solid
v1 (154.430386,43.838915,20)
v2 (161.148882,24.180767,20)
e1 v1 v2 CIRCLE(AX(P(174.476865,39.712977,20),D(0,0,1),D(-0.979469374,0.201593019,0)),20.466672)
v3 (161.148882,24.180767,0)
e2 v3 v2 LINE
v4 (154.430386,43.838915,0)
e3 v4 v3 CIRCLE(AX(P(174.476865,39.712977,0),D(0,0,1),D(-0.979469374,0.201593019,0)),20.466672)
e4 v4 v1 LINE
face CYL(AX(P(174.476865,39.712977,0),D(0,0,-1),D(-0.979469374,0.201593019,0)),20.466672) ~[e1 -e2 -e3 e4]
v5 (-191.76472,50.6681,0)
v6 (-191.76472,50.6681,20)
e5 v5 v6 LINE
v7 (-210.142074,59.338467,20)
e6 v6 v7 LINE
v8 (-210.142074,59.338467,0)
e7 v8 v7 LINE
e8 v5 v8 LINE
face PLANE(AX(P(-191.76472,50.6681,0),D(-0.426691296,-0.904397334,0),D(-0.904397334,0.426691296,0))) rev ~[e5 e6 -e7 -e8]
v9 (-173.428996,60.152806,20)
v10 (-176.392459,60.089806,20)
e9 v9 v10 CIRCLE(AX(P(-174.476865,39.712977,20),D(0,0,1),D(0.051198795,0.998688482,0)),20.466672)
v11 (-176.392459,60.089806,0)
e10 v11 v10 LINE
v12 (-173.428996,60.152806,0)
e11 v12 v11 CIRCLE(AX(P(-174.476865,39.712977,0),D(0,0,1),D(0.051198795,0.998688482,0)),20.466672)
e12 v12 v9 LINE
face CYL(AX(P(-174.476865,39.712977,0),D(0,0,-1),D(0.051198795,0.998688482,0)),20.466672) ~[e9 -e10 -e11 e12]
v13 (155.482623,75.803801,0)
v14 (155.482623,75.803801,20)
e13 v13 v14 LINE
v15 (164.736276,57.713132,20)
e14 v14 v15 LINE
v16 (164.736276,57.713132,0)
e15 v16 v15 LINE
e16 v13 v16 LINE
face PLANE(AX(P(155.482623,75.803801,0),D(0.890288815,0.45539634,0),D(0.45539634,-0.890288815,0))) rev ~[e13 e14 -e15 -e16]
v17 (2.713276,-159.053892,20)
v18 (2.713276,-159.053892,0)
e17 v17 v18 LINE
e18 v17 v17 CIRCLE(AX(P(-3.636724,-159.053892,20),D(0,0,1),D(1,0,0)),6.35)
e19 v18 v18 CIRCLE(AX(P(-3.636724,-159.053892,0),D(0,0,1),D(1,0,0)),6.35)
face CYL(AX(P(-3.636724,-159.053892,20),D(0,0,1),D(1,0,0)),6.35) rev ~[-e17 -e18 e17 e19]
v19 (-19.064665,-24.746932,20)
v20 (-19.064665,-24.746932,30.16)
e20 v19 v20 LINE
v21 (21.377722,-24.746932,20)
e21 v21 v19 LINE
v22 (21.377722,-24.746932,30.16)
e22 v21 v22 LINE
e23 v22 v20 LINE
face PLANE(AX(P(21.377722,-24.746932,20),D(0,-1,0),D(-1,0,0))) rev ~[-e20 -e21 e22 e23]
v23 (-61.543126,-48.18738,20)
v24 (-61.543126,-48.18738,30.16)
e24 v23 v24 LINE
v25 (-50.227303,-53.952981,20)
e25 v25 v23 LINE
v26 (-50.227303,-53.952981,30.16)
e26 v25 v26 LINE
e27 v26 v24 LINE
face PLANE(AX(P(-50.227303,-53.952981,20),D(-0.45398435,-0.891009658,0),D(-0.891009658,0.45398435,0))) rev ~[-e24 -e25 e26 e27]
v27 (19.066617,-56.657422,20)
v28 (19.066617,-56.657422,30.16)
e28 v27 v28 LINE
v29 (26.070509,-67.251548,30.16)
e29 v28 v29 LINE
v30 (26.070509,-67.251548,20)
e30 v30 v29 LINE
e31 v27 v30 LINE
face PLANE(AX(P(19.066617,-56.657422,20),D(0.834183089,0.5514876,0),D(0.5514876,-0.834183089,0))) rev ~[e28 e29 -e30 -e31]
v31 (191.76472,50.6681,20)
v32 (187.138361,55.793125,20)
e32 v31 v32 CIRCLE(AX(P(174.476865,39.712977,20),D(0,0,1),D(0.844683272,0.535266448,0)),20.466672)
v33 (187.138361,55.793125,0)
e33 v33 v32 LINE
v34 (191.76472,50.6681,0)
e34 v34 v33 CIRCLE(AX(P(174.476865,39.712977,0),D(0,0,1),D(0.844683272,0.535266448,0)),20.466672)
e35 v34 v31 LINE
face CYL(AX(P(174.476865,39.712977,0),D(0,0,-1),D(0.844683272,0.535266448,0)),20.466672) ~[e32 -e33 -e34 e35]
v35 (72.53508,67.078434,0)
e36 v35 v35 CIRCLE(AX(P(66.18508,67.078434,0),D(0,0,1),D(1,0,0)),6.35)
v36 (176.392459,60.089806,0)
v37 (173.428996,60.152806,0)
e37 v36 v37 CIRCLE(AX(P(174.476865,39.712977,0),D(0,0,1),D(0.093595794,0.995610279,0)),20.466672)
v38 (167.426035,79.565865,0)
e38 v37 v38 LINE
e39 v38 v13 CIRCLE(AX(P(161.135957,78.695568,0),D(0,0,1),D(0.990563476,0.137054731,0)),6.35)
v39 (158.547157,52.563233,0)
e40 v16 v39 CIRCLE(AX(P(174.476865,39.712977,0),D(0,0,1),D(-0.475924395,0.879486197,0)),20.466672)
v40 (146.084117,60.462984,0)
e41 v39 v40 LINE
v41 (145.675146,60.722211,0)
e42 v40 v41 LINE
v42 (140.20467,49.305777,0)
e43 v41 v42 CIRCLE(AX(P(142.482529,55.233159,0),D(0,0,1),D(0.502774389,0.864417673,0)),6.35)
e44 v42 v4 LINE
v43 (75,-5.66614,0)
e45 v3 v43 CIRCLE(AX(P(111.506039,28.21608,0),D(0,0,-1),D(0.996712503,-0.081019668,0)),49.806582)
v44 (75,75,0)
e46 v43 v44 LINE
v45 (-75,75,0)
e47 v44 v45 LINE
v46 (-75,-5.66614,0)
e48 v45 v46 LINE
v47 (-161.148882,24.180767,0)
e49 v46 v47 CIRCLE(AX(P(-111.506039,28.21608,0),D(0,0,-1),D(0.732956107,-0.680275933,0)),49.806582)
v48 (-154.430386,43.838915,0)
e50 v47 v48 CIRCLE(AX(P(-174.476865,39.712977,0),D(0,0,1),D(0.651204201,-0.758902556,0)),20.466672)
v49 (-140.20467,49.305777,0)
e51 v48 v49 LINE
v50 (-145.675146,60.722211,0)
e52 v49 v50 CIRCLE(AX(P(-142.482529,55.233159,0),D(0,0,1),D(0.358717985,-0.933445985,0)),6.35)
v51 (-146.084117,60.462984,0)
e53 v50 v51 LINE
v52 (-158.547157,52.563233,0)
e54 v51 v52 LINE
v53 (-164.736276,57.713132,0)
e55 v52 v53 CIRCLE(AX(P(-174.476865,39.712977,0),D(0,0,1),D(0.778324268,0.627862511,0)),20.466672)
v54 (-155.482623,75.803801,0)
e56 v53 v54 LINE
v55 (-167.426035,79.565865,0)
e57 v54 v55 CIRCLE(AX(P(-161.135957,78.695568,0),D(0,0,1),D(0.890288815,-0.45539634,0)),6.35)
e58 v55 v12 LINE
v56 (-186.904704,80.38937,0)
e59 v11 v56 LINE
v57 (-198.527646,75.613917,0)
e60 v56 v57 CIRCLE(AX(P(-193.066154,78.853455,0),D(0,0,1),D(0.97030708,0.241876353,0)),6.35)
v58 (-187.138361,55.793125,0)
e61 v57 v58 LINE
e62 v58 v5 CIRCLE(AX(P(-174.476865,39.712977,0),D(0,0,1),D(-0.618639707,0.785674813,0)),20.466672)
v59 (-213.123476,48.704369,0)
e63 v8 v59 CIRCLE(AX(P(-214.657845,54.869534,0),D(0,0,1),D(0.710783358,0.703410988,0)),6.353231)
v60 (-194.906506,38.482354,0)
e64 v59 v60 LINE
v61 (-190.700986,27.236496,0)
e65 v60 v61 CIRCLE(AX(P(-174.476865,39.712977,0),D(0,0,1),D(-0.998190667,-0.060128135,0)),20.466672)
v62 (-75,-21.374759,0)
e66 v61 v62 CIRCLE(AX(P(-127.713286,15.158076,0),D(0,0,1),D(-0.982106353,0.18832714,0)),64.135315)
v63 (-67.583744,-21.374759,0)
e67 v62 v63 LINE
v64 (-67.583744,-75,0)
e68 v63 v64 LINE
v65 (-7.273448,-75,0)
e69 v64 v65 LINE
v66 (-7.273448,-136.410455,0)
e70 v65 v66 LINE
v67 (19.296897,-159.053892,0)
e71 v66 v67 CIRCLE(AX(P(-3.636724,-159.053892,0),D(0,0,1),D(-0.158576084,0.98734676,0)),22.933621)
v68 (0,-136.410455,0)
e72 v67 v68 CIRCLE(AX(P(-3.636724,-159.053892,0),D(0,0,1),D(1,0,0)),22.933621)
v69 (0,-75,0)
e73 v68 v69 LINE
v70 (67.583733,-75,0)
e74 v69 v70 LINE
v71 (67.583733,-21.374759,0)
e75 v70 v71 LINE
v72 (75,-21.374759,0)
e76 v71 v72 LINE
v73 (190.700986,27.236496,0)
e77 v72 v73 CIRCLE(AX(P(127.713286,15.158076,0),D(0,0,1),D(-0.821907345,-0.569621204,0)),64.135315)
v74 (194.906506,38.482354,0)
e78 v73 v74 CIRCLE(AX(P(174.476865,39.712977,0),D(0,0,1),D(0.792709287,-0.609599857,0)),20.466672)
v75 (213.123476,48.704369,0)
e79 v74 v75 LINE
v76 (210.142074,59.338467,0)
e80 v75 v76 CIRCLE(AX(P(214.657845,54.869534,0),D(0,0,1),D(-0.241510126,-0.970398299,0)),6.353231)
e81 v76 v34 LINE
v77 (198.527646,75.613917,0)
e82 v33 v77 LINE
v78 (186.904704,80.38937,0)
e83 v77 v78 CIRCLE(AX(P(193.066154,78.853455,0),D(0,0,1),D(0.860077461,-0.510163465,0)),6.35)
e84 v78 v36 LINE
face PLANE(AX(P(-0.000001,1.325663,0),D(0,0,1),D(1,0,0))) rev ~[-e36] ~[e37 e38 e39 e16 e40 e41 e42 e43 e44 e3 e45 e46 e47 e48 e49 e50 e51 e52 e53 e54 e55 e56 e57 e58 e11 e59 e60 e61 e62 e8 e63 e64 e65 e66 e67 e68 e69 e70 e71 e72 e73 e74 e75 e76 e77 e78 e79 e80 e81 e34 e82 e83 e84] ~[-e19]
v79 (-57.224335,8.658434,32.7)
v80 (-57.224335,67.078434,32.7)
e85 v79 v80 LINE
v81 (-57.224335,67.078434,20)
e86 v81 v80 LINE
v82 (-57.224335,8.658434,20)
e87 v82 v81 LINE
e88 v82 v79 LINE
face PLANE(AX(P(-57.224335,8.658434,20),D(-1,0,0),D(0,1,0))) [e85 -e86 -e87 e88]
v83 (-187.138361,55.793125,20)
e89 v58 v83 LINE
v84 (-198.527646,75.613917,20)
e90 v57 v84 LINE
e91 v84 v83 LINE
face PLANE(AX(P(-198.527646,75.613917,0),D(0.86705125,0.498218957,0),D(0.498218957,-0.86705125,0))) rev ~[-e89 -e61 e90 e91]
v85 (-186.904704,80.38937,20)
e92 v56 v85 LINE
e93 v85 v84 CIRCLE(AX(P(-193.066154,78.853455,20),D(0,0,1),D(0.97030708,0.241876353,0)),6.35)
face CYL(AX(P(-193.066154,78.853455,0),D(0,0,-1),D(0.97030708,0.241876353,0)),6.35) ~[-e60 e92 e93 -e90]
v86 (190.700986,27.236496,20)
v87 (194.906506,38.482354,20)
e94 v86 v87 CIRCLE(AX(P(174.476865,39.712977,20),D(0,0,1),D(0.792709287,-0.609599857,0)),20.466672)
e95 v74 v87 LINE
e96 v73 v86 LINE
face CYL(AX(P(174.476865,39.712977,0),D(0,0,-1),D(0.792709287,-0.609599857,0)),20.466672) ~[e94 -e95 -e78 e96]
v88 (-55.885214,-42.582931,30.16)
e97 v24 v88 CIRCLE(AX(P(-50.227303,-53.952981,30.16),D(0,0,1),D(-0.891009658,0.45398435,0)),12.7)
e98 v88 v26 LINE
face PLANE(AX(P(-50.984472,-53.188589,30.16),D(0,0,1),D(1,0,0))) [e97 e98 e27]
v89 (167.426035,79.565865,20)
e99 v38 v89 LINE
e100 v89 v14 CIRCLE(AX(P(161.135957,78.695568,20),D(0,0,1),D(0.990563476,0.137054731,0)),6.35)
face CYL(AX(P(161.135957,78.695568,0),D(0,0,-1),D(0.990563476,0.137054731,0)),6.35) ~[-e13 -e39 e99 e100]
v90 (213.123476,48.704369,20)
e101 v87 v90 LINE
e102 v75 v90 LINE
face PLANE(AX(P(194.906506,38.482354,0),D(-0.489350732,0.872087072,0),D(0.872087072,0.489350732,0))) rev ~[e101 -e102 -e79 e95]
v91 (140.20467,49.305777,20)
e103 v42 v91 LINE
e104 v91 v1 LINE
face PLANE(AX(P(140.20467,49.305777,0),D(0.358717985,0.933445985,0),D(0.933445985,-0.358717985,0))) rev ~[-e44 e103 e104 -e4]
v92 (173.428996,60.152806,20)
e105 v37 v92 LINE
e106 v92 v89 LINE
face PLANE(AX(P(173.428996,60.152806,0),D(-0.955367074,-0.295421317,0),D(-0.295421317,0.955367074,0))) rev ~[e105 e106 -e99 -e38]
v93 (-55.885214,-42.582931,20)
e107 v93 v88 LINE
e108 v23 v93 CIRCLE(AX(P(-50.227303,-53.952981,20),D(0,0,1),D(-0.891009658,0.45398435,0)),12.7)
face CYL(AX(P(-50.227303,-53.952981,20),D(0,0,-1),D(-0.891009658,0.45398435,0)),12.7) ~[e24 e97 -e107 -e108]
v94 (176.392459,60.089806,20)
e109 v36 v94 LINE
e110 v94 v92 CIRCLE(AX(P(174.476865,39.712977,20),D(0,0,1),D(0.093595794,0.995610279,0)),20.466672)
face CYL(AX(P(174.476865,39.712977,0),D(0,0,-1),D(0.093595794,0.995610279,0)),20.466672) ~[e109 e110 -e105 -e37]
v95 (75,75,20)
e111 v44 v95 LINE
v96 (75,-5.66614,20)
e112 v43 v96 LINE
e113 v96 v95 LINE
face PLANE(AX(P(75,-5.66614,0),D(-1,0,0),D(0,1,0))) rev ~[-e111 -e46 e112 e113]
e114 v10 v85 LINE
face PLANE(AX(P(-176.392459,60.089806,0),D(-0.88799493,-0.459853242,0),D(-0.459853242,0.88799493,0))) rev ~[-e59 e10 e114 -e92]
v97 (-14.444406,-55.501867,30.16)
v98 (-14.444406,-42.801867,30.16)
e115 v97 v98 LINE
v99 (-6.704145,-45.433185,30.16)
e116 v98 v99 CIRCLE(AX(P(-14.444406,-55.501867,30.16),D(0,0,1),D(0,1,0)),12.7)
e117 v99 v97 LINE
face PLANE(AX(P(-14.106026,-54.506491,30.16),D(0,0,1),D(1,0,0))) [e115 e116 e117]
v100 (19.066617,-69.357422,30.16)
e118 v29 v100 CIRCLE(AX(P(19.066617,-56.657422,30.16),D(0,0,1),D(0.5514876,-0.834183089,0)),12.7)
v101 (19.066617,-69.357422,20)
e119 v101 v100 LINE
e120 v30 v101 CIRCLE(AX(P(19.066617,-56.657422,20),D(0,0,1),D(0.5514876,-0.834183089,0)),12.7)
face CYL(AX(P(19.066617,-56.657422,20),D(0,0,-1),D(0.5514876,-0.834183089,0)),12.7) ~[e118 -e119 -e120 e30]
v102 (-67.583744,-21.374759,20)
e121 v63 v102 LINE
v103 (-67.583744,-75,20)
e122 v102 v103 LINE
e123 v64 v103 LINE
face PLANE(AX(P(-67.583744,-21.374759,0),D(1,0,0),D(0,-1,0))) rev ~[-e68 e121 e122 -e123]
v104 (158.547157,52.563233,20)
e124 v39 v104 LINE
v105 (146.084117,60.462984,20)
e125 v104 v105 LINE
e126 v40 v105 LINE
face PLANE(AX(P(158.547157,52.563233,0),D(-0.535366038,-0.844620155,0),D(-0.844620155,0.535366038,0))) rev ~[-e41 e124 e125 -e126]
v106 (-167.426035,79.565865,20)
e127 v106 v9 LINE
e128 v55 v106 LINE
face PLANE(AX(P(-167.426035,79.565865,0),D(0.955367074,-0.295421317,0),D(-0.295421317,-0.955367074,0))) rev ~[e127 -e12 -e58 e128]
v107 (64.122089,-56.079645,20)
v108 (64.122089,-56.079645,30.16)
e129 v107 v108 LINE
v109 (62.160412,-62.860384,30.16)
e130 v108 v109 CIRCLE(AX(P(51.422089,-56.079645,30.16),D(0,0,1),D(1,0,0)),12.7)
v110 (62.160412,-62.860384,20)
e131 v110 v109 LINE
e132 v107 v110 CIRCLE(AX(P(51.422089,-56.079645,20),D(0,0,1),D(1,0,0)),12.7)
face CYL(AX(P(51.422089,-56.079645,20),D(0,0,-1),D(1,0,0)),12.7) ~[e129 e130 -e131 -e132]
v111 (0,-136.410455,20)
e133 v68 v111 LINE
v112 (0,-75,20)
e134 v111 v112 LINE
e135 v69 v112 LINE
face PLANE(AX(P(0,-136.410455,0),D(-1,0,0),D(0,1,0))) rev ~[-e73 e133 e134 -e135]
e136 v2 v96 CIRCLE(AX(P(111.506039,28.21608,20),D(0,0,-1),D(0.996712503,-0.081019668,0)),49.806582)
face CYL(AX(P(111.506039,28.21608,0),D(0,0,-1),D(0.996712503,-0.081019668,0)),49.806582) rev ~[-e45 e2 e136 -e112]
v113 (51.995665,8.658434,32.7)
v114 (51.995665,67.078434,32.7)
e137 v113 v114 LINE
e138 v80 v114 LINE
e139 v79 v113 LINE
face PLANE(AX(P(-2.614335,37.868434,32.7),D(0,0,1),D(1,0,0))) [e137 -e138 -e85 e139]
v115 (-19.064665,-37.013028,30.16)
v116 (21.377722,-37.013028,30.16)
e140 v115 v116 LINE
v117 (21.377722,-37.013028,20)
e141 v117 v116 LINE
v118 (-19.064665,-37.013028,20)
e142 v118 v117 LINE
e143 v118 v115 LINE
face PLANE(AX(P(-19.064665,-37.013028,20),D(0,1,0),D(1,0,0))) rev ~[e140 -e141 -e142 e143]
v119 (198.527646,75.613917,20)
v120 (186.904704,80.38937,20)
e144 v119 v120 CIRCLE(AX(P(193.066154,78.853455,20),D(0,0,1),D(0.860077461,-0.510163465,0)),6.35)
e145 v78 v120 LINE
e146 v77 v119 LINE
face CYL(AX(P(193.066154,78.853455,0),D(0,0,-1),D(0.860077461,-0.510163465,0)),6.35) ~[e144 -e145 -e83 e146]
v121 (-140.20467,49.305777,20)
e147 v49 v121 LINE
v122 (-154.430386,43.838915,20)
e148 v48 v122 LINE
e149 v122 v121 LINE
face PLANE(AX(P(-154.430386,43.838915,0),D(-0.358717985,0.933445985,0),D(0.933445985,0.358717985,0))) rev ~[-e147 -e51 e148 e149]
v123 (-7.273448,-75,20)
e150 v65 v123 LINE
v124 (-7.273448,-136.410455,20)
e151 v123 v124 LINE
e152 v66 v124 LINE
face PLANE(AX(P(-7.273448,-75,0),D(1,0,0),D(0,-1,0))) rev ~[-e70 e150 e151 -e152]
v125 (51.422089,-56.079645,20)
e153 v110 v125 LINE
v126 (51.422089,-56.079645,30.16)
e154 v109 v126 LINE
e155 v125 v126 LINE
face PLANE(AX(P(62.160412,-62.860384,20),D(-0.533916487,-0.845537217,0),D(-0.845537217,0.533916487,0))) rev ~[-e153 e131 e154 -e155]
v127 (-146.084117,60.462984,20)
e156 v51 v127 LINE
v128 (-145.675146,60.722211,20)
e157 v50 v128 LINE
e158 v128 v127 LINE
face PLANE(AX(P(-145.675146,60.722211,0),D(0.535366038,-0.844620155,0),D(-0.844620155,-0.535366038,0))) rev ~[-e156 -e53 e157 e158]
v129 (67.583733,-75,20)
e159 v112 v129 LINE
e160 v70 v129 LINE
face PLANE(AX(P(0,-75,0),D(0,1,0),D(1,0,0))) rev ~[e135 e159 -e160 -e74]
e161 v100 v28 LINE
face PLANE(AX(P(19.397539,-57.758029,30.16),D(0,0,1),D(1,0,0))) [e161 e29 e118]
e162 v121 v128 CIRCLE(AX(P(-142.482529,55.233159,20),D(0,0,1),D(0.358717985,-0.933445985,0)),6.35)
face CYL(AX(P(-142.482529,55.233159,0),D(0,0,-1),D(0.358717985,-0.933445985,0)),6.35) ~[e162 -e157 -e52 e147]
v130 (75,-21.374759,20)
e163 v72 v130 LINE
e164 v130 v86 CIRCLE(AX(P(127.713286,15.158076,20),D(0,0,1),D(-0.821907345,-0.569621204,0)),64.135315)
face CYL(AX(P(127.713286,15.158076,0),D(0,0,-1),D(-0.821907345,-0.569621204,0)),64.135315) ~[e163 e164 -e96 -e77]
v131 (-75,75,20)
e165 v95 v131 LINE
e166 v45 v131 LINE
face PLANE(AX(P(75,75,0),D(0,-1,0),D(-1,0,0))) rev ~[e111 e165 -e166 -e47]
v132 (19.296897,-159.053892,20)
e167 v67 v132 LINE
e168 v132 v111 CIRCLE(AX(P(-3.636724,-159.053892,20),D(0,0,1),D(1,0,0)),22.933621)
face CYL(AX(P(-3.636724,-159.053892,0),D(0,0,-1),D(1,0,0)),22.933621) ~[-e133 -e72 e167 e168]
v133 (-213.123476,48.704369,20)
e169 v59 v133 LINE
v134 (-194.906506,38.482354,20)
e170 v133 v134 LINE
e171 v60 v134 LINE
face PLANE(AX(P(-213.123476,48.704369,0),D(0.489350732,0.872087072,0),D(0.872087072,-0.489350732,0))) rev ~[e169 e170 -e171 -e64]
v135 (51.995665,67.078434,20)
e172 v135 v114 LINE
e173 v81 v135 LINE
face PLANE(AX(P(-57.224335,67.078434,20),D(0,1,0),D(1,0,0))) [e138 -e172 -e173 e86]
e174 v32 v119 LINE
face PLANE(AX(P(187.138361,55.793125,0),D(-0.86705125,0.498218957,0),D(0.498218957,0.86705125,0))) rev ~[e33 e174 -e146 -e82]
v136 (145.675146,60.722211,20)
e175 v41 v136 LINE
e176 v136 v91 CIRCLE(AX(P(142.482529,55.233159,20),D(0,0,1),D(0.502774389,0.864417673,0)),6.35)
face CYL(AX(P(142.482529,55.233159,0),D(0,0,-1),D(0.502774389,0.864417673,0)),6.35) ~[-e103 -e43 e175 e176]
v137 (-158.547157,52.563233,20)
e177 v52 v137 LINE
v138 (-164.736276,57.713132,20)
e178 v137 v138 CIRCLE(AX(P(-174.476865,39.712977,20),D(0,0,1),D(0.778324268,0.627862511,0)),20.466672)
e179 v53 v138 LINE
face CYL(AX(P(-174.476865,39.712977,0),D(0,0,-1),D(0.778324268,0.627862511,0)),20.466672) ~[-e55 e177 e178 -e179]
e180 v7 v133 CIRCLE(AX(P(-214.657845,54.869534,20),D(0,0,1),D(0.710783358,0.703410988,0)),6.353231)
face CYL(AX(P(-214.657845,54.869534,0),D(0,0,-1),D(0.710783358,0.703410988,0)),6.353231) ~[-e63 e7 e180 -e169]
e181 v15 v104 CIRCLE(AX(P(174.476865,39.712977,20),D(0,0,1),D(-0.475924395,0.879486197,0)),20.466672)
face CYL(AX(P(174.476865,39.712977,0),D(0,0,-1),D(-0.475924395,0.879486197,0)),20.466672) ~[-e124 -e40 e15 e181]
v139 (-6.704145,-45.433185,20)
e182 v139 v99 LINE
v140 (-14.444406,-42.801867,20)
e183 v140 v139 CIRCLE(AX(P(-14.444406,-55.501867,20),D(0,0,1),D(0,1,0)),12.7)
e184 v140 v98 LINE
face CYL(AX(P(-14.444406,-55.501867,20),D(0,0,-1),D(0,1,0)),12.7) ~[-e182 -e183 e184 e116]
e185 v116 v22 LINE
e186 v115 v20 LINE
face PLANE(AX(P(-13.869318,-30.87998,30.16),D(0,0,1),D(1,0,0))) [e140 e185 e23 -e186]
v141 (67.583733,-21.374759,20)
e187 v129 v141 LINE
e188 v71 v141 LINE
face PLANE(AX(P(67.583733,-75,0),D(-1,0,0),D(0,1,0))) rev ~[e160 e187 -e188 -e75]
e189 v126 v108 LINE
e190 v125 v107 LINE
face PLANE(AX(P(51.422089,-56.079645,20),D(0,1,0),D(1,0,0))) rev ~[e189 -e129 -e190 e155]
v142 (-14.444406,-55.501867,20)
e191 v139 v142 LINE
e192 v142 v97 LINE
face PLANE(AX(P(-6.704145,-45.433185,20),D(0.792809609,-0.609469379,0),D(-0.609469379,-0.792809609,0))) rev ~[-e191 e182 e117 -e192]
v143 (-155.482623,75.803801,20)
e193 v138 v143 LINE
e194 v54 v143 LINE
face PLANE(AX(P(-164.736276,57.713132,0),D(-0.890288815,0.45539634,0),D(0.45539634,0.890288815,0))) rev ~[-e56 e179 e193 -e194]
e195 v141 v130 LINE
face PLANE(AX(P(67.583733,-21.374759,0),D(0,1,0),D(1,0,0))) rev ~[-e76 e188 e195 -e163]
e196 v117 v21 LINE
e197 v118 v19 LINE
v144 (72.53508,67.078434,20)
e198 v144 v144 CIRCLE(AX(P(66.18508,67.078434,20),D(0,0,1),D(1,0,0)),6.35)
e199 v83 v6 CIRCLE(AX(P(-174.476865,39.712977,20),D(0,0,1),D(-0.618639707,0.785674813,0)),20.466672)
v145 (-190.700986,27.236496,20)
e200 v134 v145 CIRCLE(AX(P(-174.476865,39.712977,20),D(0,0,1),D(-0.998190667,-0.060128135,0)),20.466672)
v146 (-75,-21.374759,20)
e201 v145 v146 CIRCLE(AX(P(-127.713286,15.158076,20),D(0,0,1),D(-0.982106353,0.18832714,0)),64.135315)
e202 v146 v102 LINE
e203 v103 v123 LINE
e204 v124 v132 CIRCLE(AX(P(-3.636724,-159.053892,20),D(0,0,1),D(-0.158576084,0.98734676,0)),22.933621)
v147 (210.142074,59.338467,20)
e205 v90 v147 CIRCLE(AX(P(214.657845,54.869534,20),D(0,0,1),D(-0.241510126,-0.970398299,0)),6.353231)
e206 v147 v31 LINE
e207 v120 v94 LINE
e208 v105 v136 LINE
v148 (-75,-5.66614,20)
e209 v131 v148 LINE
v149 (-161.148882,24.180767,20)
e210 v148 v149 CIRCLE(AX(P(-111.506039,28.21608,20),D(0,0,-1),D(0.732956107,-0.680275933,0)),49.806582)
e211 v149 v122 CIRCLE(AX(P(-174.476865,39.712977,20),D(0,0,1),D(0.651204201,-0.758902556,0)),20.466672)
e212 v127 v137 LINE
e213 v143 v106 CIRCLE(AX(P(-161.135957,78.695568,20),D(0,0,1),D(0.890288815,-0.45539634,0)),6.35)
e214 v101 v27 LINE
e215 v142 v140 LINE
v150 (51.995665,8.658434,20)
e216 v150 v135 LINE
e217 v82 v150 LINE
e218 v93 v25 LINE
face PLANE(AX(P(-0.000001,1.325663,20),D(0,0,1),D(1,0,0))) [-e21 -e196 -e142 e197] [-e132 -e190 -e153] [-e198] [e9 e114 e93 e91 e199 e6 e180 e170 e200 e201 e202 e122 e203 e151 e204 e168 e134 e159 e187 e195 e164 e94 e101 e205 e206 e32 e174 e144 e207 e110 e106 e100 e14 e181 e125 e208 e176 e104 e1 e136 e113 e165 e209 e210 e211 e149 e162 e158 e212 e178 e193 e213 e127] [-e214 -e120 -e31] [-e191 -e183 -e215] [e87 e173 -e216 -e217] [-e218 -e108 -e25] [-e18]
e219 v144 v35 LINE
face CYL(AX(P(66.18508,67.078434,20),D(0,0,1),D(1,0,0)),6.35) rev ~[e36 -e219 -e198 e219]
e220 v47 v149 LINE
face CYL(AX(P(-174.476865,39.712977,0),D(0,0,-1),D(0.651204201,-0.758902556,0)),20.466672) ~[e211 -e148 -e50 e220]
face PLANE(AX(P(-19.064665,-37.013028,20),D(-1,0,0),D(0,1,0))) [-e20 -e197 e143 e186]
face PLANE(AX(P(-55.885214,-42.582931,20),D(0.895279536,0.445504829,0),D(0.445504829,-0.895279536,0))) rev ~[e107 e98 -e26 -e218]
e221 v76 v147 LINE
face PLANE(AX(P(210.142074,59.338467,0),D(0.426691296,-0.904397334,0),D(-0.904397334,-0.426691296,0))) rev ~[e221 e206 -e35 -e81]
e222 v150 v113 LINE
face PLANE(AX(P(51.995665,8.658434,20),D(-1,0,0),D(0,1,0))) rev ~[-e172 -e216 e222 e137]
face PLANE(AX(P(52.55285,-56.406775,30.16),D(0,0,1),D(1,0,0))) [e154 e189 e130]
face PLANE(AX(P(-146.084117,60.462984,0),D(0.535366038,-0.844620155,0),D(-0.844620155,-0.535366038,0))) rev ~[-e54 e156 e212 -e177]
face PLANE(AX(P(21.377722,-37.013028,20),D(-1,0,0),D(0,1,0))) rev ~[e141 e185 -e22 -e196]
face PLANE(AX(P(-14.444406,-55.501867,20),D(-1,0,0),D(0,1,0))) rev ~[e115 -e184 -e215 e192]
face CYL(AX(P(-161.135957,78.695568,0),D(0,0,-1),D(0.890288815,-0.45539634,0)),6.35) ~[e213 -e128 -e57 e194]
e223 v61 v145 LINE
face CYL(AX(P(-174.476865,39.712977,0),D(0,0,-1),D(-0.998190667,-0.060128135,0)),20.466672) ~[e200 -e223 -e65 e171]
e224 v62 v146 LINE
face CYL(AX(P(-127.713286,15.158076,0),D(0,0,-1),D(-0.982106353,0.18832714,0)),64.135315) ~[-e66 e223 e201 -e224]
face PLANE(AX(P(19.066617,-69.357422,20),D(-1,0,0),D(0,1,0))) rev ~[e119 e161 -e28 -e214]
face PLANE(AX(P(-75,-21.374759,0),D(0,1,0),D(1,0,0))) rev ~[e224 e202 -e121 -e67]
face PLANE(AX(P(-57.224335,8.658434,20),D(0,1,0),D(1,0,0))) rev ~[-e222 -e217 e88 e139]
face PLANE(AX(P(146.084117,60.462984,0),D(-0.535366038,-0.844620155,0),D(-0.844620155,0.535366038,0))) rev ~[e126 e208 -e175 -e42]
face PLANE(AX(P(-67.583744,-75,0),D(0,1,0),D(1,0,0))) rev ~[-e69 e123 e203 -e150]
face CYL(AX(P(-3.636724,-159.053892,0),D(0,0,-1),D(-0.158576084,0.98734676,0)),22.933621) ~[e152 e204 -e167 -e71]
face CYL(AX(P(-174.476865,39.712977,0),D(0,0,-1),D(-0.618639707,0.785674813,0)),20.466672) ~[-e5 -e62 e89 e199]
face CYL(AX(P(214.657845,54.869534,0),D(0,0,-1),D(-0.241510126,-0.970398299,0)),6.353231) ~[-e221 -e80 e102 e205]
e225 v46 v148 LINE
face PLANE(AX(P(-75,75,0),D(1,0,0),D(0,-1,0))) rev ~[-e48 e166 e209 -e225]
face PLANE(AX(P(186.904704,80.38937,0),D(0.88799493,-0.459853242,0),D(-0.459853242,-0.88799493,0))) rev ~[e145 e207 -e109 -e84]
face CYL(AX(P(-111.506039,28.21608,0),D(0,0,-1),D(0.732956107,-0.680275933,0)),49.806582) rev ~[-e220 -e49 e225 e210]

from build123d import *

# Parameters (mm, degrees)
F0_R     = 4.2534442679
F1_DEPTH = 20
F2_W     = 10.3906942531
F2_H     = 12.2660957277
F2_W_2   = 9.8304990679
F2_W_3   = 9.2522380874
F2_W_4   = 10.9689552337
F3_DEPTH = 10.16
F5_R     = 6.35
F6_DEPTH = 25.4
F7_R     = 6.35
F8_DEPTH = 25.4
F4_W     = 109.22
F4_H     = 58.420000254
F9_DEPTH = 12.7


# Not quite as in the source:
# - a feature names something its author has since deleted; it is built from what else it names


with BuildPart() as f1:
    # F0 (on Top) → F1 (new body)
    with BuildSketch(Plane.XY):
        Polygon((-67.5837442279, -21.374759078), (-67.5837442279, -75), (-7.2734476998, -75), (0, -75), (67.5837334, -75), (67.5837334, -21.374759078), (75, -21.374759078), (75, -5.6661395316), (75, 75), (-75, 75), (-75, -5.6661395316), (-75, -21.374759078), align=None)
        with BuildLine():
            ThreePointArc((-190.7009859405, 27.2364963511), (-152.5558792144, -43.9704630954), (-75, -21.374759078))
            Line((-75, -21.374759078), (-75, -5.6661395316))
            ThreePointArc((-75, -5.6661395316), (-127.811049195, -18.8460311242), (-161.148882109, 24.1807669913))
            ThreePointArc((-161.148882109, 24.1807669913), (-155.1100282823, 33.0940415029), (-154.4303864618, 43.8389149342))
            Line((-154.4303864618, 43.8389149342), (-140.2046696458, 49.3057770206))
            ThreePointArc((-140.2046696458, 49.3057770206), (-136.7560169722, 57.9771637157), (-145.6751462177, 60.7222112528))
            Line((-145.6751462177, 60.7222112528), (-146.0841166448, 60.4629836272))
            Line((-146.0841166448, 60.4629836272), (-158.5471573729, 52.5632328352))
            ThreePointArc((-158.5471573729, 52.5632328352), (-161.385975302, 55.4455313061), (-164.7362764103, 57.7131322838))
            Line((-164.7362764103, 57.7131322838), (-155.482622785, 75.8038009996))
            ThreePointArc((-155.482622785, 75.8038009996), (-159.2281719938, 84.7522052149), (-167.4260348338, 79.5658652979))
            Line((-167.4260348338, 79.5658652979), (-173.4289959882, 60.1528063587))
            ThreePointArc((-173.4289959882, 60.1528063587), (-174.9118696964, 60.1750253912), (-176.3924593558, 60.0898057902))
            Line((-176.3924593558, 60.0898057902), (-186.9047044679, 80.3893698915))
            ThreePointArc((-186.9047044679, 80.3893698915), (-195.4793934942, 84.7270210192), (-198.5276463049, 75.6139170472))
            Line((-198.5276463049, 75.6139170472), (-187.1383609375, 55.7931254681))
            ThreePointArc((-187.1383609375, 55.7931254681), (-189.6692112484, 53.4271036789), (-191.7647204388, 50.6680995766))
            Line((-191.7647204388, 50.6680995766), (-210.142074272, 59.3384667019))
            ThreePointArc((-210.142074272, 59.3384667019), (-220.775202398, 56.5846111171), (-213.1234756292, 48.7043692565))
            Line((-213.1234756292, 48.7043692565), (-194.9065059539, 38.4823538939))
            ThreePointArc((-194.9065059539, 38.4823538939), (-193.6469430671, 32.5441016935), (-190.7009859405, 27.2364963511))
        make_face()
        with BuildLine():
            Line((75, -5.6661395316), (75, -21.374759078))
            ThreePointArc((75, -21.374759078), (152.5558792144, -43.9704630954), (190.7009859405, 27.2364963511))
            ThreePointArc((190.7009859405, 27.2364963511), (193.6469430671, 32.5441016935), (194.9065059539, 38.4823538939))
            Line((194.9065059539, 38.4823538939), (213.1234756292, 48.7043692565))
            ThreePointArc((213.1234756292, 48.7043692565), (220.775202398, 56.5846111171), (210.142074272, 59.3384667019))
            Line((210.142074272, 59.3384667019), (191.7647204388, 50.6680995766))
            ThreePointArc((191.7647204388, 50.6680995766), (189.6692112484, 53.4271036789), (187.1383609375, 55.7931254681))
            Line((187.1383609375, 55.7931254681), (198.5276463049, 75.6139170472))
            ThreePointArc((198.5276463049, 75.6139170472), (195.4793934942, 84.7270210192), (186.9047044679, 80.3893698915))
            Line((186.9047044679, 80.3893698915), (176.3924593558, 60.0898057902))
            ThreePointArc((176.3924593558, 60.0898057902), (174.9118696964, 60.1750253912), (173.4289959882, 60.1528063587))
            Line((173.4289959882, 60.1528063587), (167.4260348338, 79.5658652979))
            ThreePointArc((167.4260348338, 79.5658652979), (159.2281719938, 84.7522052149), (155.482622785, 75.8038009996))
            Line((155.482622785, 75.8038009996), (164.7362764103, 57.7131322838))
            ThreePointArc((164.7362764103, 57.7131322838), (161.385975302, 55.4455313061), (158.5471573729, 52.5632328352))
            Line((158.5471573729, 52.5632328352), (146.0841166448, 60.4629836272))
            Line((146.0841166448, 60.4629836272), (145.6751462177, 60.7222112528))
            ThreePointArc((145.6751462177, 60.7222112528), (136.7560169722, 57.9771637157), (140.2046696458, 49.3057770206))
            Line((140.2046696458, 49.3057770206), (154.4303864618, 43.8389149342))
            ThreePointArc((154.4303864618, 43.8389149342), (155.1100282823, 33.0940415029), (161.148882109, 24.1807669913))
            ThreePointArc((161.148882109, 24.1807669913), (127.811049195, -18.8460311242), (75, -5.6661395316))
        make_face()
        with BuildLine():
            Line((0, -75), (-7.2734476998, -75))
            Line((-7.2734476998, -75), (-7.2734476998, -136.4104553148))
            ThreePointArc((-7.2734476998, -136.4104553148), (-3.6367238499, -136.120270713), (0, -136.4104553148))
            Line((0, -136.4104553148), (0, -75))
        make_face()
        with BuildLine():
            ThreePointArc((0, -136.4104553148), (-3.6367238499, -136.120270713), (-7.2734476998, -136.4104553148))
            ThreePointArc((-7.2734476998, -136.4104553148), (-18.5120008809, -176.508894443), (19.2968973343, -159.0538918972))
            ThreePointArc((19.2968973343, -159.0538918972), (13.8182786959, -144.1786148662), (0, -136.4104553148))
        make_face()
        with Locations((-3.6367238499, -159.0538918972)):
            Circle(F0_R, mode=Mode.SUBTRACT)
        with Locations((-3.6367238499, -159.0538918972)):
            Circle(F0_R)
    extrude(amount=F1_DEPTH)

    # F2 (on face) → F3 (join)
    with BuildSketch(Plane.XY.offset(20)):
        with Locations((-13.8693177141, -30.8799799532)):
            Rectangle(F2_W, F2_H)
        with Locations((-3.7587210536, -30.8799799532)):
            Rectangle(F2_W_2, F2_H)
        with Locations((5.782647524, -30.8799799532)):
            Rectangle(F2_W_3, F2_H)
        with Locations((15.8932441846, -30.8799799532)):
            Rectangle(F2_W_4, F2_H)
        with BuildLine():
            Line((-50.2273030579, -53.9529807866), (-61.5431257083, -48.187379539))
            ThreePointArc((-61.5431257083, -48.187379539), (-41.2897769448, -62.9757645575), (-55.8852143831, -42.5829306795))
            Line((-55.8852143831, -42.5829306795), (-50.2273030579, -53.9529807866))
        make_face()
        with BuildLine():
            Line((-14.4444061443, -55.5018670857), (-14.4444061443, -42.8018670857))
            ThreePointArc((-14.4444061443, -42.8018670857), (-18.5320544995, -67.5260564939), (-6.7041450331, -45.4331850503))
            Line((-6.7041450331, -45.4331850503), (-14.4444061443, -55.5018670857))
        make_face()
        with BuildLine():
            Line((19.0666168928, -56.657422334), (26.0705094181, -67.2515475689))
            ThreePointArc((26.0705094181, -67.2515475689), (15.4098006877, -44.4952804485), (19.0666168928, -69.357422334))
            Line((19.0666168928, -69.357422334), (19.0666168928, -56.657422334))
        make_face()
        with BuildLine():
            Line((51.4220893383, -56.0796447098), (64.1220893383, -56.0796447098))
            ThreePointArc((64.1220893383, -56.0796447098), (39.2223619287, -52.550246584), (62.1604119949, -62.8603840886))
            Line((62.1604119949, -62.8603840886), (51.4220893383, -56.0796447098))
        make_face()
    extrude(amount=F3_DEPTH)

    # F5 (on face) → F6 (cut)
    with BuildSketch(Plane.XY.offset(20)):
        with Locations((-3.6367238499, -159.0538918972)):
            Circle(F5_R)
    extrude(amount=-F6_DEPTH, mode=Mode.SUBTRACT)

    # F7 (on face) → F8 (cut)
    with BuildSketch(Plane.XY.offset(20)):
        with Locations((66.185079515, 67.0784339309)):
            Circle(F7_R)
    extrude(amount=-F8_DEPTH, mode=Mode.SUBTRACT)

    # F4 (on face) → F9 (join)
    with BuildSketch(Plane.XY.offset(20)):
        with Locations((-2.614335165, 37.8684338039)):
            Rectangle(F4_W, F4_H)
    extrude(amount=F9_DEPTH)


solid = f1.part
